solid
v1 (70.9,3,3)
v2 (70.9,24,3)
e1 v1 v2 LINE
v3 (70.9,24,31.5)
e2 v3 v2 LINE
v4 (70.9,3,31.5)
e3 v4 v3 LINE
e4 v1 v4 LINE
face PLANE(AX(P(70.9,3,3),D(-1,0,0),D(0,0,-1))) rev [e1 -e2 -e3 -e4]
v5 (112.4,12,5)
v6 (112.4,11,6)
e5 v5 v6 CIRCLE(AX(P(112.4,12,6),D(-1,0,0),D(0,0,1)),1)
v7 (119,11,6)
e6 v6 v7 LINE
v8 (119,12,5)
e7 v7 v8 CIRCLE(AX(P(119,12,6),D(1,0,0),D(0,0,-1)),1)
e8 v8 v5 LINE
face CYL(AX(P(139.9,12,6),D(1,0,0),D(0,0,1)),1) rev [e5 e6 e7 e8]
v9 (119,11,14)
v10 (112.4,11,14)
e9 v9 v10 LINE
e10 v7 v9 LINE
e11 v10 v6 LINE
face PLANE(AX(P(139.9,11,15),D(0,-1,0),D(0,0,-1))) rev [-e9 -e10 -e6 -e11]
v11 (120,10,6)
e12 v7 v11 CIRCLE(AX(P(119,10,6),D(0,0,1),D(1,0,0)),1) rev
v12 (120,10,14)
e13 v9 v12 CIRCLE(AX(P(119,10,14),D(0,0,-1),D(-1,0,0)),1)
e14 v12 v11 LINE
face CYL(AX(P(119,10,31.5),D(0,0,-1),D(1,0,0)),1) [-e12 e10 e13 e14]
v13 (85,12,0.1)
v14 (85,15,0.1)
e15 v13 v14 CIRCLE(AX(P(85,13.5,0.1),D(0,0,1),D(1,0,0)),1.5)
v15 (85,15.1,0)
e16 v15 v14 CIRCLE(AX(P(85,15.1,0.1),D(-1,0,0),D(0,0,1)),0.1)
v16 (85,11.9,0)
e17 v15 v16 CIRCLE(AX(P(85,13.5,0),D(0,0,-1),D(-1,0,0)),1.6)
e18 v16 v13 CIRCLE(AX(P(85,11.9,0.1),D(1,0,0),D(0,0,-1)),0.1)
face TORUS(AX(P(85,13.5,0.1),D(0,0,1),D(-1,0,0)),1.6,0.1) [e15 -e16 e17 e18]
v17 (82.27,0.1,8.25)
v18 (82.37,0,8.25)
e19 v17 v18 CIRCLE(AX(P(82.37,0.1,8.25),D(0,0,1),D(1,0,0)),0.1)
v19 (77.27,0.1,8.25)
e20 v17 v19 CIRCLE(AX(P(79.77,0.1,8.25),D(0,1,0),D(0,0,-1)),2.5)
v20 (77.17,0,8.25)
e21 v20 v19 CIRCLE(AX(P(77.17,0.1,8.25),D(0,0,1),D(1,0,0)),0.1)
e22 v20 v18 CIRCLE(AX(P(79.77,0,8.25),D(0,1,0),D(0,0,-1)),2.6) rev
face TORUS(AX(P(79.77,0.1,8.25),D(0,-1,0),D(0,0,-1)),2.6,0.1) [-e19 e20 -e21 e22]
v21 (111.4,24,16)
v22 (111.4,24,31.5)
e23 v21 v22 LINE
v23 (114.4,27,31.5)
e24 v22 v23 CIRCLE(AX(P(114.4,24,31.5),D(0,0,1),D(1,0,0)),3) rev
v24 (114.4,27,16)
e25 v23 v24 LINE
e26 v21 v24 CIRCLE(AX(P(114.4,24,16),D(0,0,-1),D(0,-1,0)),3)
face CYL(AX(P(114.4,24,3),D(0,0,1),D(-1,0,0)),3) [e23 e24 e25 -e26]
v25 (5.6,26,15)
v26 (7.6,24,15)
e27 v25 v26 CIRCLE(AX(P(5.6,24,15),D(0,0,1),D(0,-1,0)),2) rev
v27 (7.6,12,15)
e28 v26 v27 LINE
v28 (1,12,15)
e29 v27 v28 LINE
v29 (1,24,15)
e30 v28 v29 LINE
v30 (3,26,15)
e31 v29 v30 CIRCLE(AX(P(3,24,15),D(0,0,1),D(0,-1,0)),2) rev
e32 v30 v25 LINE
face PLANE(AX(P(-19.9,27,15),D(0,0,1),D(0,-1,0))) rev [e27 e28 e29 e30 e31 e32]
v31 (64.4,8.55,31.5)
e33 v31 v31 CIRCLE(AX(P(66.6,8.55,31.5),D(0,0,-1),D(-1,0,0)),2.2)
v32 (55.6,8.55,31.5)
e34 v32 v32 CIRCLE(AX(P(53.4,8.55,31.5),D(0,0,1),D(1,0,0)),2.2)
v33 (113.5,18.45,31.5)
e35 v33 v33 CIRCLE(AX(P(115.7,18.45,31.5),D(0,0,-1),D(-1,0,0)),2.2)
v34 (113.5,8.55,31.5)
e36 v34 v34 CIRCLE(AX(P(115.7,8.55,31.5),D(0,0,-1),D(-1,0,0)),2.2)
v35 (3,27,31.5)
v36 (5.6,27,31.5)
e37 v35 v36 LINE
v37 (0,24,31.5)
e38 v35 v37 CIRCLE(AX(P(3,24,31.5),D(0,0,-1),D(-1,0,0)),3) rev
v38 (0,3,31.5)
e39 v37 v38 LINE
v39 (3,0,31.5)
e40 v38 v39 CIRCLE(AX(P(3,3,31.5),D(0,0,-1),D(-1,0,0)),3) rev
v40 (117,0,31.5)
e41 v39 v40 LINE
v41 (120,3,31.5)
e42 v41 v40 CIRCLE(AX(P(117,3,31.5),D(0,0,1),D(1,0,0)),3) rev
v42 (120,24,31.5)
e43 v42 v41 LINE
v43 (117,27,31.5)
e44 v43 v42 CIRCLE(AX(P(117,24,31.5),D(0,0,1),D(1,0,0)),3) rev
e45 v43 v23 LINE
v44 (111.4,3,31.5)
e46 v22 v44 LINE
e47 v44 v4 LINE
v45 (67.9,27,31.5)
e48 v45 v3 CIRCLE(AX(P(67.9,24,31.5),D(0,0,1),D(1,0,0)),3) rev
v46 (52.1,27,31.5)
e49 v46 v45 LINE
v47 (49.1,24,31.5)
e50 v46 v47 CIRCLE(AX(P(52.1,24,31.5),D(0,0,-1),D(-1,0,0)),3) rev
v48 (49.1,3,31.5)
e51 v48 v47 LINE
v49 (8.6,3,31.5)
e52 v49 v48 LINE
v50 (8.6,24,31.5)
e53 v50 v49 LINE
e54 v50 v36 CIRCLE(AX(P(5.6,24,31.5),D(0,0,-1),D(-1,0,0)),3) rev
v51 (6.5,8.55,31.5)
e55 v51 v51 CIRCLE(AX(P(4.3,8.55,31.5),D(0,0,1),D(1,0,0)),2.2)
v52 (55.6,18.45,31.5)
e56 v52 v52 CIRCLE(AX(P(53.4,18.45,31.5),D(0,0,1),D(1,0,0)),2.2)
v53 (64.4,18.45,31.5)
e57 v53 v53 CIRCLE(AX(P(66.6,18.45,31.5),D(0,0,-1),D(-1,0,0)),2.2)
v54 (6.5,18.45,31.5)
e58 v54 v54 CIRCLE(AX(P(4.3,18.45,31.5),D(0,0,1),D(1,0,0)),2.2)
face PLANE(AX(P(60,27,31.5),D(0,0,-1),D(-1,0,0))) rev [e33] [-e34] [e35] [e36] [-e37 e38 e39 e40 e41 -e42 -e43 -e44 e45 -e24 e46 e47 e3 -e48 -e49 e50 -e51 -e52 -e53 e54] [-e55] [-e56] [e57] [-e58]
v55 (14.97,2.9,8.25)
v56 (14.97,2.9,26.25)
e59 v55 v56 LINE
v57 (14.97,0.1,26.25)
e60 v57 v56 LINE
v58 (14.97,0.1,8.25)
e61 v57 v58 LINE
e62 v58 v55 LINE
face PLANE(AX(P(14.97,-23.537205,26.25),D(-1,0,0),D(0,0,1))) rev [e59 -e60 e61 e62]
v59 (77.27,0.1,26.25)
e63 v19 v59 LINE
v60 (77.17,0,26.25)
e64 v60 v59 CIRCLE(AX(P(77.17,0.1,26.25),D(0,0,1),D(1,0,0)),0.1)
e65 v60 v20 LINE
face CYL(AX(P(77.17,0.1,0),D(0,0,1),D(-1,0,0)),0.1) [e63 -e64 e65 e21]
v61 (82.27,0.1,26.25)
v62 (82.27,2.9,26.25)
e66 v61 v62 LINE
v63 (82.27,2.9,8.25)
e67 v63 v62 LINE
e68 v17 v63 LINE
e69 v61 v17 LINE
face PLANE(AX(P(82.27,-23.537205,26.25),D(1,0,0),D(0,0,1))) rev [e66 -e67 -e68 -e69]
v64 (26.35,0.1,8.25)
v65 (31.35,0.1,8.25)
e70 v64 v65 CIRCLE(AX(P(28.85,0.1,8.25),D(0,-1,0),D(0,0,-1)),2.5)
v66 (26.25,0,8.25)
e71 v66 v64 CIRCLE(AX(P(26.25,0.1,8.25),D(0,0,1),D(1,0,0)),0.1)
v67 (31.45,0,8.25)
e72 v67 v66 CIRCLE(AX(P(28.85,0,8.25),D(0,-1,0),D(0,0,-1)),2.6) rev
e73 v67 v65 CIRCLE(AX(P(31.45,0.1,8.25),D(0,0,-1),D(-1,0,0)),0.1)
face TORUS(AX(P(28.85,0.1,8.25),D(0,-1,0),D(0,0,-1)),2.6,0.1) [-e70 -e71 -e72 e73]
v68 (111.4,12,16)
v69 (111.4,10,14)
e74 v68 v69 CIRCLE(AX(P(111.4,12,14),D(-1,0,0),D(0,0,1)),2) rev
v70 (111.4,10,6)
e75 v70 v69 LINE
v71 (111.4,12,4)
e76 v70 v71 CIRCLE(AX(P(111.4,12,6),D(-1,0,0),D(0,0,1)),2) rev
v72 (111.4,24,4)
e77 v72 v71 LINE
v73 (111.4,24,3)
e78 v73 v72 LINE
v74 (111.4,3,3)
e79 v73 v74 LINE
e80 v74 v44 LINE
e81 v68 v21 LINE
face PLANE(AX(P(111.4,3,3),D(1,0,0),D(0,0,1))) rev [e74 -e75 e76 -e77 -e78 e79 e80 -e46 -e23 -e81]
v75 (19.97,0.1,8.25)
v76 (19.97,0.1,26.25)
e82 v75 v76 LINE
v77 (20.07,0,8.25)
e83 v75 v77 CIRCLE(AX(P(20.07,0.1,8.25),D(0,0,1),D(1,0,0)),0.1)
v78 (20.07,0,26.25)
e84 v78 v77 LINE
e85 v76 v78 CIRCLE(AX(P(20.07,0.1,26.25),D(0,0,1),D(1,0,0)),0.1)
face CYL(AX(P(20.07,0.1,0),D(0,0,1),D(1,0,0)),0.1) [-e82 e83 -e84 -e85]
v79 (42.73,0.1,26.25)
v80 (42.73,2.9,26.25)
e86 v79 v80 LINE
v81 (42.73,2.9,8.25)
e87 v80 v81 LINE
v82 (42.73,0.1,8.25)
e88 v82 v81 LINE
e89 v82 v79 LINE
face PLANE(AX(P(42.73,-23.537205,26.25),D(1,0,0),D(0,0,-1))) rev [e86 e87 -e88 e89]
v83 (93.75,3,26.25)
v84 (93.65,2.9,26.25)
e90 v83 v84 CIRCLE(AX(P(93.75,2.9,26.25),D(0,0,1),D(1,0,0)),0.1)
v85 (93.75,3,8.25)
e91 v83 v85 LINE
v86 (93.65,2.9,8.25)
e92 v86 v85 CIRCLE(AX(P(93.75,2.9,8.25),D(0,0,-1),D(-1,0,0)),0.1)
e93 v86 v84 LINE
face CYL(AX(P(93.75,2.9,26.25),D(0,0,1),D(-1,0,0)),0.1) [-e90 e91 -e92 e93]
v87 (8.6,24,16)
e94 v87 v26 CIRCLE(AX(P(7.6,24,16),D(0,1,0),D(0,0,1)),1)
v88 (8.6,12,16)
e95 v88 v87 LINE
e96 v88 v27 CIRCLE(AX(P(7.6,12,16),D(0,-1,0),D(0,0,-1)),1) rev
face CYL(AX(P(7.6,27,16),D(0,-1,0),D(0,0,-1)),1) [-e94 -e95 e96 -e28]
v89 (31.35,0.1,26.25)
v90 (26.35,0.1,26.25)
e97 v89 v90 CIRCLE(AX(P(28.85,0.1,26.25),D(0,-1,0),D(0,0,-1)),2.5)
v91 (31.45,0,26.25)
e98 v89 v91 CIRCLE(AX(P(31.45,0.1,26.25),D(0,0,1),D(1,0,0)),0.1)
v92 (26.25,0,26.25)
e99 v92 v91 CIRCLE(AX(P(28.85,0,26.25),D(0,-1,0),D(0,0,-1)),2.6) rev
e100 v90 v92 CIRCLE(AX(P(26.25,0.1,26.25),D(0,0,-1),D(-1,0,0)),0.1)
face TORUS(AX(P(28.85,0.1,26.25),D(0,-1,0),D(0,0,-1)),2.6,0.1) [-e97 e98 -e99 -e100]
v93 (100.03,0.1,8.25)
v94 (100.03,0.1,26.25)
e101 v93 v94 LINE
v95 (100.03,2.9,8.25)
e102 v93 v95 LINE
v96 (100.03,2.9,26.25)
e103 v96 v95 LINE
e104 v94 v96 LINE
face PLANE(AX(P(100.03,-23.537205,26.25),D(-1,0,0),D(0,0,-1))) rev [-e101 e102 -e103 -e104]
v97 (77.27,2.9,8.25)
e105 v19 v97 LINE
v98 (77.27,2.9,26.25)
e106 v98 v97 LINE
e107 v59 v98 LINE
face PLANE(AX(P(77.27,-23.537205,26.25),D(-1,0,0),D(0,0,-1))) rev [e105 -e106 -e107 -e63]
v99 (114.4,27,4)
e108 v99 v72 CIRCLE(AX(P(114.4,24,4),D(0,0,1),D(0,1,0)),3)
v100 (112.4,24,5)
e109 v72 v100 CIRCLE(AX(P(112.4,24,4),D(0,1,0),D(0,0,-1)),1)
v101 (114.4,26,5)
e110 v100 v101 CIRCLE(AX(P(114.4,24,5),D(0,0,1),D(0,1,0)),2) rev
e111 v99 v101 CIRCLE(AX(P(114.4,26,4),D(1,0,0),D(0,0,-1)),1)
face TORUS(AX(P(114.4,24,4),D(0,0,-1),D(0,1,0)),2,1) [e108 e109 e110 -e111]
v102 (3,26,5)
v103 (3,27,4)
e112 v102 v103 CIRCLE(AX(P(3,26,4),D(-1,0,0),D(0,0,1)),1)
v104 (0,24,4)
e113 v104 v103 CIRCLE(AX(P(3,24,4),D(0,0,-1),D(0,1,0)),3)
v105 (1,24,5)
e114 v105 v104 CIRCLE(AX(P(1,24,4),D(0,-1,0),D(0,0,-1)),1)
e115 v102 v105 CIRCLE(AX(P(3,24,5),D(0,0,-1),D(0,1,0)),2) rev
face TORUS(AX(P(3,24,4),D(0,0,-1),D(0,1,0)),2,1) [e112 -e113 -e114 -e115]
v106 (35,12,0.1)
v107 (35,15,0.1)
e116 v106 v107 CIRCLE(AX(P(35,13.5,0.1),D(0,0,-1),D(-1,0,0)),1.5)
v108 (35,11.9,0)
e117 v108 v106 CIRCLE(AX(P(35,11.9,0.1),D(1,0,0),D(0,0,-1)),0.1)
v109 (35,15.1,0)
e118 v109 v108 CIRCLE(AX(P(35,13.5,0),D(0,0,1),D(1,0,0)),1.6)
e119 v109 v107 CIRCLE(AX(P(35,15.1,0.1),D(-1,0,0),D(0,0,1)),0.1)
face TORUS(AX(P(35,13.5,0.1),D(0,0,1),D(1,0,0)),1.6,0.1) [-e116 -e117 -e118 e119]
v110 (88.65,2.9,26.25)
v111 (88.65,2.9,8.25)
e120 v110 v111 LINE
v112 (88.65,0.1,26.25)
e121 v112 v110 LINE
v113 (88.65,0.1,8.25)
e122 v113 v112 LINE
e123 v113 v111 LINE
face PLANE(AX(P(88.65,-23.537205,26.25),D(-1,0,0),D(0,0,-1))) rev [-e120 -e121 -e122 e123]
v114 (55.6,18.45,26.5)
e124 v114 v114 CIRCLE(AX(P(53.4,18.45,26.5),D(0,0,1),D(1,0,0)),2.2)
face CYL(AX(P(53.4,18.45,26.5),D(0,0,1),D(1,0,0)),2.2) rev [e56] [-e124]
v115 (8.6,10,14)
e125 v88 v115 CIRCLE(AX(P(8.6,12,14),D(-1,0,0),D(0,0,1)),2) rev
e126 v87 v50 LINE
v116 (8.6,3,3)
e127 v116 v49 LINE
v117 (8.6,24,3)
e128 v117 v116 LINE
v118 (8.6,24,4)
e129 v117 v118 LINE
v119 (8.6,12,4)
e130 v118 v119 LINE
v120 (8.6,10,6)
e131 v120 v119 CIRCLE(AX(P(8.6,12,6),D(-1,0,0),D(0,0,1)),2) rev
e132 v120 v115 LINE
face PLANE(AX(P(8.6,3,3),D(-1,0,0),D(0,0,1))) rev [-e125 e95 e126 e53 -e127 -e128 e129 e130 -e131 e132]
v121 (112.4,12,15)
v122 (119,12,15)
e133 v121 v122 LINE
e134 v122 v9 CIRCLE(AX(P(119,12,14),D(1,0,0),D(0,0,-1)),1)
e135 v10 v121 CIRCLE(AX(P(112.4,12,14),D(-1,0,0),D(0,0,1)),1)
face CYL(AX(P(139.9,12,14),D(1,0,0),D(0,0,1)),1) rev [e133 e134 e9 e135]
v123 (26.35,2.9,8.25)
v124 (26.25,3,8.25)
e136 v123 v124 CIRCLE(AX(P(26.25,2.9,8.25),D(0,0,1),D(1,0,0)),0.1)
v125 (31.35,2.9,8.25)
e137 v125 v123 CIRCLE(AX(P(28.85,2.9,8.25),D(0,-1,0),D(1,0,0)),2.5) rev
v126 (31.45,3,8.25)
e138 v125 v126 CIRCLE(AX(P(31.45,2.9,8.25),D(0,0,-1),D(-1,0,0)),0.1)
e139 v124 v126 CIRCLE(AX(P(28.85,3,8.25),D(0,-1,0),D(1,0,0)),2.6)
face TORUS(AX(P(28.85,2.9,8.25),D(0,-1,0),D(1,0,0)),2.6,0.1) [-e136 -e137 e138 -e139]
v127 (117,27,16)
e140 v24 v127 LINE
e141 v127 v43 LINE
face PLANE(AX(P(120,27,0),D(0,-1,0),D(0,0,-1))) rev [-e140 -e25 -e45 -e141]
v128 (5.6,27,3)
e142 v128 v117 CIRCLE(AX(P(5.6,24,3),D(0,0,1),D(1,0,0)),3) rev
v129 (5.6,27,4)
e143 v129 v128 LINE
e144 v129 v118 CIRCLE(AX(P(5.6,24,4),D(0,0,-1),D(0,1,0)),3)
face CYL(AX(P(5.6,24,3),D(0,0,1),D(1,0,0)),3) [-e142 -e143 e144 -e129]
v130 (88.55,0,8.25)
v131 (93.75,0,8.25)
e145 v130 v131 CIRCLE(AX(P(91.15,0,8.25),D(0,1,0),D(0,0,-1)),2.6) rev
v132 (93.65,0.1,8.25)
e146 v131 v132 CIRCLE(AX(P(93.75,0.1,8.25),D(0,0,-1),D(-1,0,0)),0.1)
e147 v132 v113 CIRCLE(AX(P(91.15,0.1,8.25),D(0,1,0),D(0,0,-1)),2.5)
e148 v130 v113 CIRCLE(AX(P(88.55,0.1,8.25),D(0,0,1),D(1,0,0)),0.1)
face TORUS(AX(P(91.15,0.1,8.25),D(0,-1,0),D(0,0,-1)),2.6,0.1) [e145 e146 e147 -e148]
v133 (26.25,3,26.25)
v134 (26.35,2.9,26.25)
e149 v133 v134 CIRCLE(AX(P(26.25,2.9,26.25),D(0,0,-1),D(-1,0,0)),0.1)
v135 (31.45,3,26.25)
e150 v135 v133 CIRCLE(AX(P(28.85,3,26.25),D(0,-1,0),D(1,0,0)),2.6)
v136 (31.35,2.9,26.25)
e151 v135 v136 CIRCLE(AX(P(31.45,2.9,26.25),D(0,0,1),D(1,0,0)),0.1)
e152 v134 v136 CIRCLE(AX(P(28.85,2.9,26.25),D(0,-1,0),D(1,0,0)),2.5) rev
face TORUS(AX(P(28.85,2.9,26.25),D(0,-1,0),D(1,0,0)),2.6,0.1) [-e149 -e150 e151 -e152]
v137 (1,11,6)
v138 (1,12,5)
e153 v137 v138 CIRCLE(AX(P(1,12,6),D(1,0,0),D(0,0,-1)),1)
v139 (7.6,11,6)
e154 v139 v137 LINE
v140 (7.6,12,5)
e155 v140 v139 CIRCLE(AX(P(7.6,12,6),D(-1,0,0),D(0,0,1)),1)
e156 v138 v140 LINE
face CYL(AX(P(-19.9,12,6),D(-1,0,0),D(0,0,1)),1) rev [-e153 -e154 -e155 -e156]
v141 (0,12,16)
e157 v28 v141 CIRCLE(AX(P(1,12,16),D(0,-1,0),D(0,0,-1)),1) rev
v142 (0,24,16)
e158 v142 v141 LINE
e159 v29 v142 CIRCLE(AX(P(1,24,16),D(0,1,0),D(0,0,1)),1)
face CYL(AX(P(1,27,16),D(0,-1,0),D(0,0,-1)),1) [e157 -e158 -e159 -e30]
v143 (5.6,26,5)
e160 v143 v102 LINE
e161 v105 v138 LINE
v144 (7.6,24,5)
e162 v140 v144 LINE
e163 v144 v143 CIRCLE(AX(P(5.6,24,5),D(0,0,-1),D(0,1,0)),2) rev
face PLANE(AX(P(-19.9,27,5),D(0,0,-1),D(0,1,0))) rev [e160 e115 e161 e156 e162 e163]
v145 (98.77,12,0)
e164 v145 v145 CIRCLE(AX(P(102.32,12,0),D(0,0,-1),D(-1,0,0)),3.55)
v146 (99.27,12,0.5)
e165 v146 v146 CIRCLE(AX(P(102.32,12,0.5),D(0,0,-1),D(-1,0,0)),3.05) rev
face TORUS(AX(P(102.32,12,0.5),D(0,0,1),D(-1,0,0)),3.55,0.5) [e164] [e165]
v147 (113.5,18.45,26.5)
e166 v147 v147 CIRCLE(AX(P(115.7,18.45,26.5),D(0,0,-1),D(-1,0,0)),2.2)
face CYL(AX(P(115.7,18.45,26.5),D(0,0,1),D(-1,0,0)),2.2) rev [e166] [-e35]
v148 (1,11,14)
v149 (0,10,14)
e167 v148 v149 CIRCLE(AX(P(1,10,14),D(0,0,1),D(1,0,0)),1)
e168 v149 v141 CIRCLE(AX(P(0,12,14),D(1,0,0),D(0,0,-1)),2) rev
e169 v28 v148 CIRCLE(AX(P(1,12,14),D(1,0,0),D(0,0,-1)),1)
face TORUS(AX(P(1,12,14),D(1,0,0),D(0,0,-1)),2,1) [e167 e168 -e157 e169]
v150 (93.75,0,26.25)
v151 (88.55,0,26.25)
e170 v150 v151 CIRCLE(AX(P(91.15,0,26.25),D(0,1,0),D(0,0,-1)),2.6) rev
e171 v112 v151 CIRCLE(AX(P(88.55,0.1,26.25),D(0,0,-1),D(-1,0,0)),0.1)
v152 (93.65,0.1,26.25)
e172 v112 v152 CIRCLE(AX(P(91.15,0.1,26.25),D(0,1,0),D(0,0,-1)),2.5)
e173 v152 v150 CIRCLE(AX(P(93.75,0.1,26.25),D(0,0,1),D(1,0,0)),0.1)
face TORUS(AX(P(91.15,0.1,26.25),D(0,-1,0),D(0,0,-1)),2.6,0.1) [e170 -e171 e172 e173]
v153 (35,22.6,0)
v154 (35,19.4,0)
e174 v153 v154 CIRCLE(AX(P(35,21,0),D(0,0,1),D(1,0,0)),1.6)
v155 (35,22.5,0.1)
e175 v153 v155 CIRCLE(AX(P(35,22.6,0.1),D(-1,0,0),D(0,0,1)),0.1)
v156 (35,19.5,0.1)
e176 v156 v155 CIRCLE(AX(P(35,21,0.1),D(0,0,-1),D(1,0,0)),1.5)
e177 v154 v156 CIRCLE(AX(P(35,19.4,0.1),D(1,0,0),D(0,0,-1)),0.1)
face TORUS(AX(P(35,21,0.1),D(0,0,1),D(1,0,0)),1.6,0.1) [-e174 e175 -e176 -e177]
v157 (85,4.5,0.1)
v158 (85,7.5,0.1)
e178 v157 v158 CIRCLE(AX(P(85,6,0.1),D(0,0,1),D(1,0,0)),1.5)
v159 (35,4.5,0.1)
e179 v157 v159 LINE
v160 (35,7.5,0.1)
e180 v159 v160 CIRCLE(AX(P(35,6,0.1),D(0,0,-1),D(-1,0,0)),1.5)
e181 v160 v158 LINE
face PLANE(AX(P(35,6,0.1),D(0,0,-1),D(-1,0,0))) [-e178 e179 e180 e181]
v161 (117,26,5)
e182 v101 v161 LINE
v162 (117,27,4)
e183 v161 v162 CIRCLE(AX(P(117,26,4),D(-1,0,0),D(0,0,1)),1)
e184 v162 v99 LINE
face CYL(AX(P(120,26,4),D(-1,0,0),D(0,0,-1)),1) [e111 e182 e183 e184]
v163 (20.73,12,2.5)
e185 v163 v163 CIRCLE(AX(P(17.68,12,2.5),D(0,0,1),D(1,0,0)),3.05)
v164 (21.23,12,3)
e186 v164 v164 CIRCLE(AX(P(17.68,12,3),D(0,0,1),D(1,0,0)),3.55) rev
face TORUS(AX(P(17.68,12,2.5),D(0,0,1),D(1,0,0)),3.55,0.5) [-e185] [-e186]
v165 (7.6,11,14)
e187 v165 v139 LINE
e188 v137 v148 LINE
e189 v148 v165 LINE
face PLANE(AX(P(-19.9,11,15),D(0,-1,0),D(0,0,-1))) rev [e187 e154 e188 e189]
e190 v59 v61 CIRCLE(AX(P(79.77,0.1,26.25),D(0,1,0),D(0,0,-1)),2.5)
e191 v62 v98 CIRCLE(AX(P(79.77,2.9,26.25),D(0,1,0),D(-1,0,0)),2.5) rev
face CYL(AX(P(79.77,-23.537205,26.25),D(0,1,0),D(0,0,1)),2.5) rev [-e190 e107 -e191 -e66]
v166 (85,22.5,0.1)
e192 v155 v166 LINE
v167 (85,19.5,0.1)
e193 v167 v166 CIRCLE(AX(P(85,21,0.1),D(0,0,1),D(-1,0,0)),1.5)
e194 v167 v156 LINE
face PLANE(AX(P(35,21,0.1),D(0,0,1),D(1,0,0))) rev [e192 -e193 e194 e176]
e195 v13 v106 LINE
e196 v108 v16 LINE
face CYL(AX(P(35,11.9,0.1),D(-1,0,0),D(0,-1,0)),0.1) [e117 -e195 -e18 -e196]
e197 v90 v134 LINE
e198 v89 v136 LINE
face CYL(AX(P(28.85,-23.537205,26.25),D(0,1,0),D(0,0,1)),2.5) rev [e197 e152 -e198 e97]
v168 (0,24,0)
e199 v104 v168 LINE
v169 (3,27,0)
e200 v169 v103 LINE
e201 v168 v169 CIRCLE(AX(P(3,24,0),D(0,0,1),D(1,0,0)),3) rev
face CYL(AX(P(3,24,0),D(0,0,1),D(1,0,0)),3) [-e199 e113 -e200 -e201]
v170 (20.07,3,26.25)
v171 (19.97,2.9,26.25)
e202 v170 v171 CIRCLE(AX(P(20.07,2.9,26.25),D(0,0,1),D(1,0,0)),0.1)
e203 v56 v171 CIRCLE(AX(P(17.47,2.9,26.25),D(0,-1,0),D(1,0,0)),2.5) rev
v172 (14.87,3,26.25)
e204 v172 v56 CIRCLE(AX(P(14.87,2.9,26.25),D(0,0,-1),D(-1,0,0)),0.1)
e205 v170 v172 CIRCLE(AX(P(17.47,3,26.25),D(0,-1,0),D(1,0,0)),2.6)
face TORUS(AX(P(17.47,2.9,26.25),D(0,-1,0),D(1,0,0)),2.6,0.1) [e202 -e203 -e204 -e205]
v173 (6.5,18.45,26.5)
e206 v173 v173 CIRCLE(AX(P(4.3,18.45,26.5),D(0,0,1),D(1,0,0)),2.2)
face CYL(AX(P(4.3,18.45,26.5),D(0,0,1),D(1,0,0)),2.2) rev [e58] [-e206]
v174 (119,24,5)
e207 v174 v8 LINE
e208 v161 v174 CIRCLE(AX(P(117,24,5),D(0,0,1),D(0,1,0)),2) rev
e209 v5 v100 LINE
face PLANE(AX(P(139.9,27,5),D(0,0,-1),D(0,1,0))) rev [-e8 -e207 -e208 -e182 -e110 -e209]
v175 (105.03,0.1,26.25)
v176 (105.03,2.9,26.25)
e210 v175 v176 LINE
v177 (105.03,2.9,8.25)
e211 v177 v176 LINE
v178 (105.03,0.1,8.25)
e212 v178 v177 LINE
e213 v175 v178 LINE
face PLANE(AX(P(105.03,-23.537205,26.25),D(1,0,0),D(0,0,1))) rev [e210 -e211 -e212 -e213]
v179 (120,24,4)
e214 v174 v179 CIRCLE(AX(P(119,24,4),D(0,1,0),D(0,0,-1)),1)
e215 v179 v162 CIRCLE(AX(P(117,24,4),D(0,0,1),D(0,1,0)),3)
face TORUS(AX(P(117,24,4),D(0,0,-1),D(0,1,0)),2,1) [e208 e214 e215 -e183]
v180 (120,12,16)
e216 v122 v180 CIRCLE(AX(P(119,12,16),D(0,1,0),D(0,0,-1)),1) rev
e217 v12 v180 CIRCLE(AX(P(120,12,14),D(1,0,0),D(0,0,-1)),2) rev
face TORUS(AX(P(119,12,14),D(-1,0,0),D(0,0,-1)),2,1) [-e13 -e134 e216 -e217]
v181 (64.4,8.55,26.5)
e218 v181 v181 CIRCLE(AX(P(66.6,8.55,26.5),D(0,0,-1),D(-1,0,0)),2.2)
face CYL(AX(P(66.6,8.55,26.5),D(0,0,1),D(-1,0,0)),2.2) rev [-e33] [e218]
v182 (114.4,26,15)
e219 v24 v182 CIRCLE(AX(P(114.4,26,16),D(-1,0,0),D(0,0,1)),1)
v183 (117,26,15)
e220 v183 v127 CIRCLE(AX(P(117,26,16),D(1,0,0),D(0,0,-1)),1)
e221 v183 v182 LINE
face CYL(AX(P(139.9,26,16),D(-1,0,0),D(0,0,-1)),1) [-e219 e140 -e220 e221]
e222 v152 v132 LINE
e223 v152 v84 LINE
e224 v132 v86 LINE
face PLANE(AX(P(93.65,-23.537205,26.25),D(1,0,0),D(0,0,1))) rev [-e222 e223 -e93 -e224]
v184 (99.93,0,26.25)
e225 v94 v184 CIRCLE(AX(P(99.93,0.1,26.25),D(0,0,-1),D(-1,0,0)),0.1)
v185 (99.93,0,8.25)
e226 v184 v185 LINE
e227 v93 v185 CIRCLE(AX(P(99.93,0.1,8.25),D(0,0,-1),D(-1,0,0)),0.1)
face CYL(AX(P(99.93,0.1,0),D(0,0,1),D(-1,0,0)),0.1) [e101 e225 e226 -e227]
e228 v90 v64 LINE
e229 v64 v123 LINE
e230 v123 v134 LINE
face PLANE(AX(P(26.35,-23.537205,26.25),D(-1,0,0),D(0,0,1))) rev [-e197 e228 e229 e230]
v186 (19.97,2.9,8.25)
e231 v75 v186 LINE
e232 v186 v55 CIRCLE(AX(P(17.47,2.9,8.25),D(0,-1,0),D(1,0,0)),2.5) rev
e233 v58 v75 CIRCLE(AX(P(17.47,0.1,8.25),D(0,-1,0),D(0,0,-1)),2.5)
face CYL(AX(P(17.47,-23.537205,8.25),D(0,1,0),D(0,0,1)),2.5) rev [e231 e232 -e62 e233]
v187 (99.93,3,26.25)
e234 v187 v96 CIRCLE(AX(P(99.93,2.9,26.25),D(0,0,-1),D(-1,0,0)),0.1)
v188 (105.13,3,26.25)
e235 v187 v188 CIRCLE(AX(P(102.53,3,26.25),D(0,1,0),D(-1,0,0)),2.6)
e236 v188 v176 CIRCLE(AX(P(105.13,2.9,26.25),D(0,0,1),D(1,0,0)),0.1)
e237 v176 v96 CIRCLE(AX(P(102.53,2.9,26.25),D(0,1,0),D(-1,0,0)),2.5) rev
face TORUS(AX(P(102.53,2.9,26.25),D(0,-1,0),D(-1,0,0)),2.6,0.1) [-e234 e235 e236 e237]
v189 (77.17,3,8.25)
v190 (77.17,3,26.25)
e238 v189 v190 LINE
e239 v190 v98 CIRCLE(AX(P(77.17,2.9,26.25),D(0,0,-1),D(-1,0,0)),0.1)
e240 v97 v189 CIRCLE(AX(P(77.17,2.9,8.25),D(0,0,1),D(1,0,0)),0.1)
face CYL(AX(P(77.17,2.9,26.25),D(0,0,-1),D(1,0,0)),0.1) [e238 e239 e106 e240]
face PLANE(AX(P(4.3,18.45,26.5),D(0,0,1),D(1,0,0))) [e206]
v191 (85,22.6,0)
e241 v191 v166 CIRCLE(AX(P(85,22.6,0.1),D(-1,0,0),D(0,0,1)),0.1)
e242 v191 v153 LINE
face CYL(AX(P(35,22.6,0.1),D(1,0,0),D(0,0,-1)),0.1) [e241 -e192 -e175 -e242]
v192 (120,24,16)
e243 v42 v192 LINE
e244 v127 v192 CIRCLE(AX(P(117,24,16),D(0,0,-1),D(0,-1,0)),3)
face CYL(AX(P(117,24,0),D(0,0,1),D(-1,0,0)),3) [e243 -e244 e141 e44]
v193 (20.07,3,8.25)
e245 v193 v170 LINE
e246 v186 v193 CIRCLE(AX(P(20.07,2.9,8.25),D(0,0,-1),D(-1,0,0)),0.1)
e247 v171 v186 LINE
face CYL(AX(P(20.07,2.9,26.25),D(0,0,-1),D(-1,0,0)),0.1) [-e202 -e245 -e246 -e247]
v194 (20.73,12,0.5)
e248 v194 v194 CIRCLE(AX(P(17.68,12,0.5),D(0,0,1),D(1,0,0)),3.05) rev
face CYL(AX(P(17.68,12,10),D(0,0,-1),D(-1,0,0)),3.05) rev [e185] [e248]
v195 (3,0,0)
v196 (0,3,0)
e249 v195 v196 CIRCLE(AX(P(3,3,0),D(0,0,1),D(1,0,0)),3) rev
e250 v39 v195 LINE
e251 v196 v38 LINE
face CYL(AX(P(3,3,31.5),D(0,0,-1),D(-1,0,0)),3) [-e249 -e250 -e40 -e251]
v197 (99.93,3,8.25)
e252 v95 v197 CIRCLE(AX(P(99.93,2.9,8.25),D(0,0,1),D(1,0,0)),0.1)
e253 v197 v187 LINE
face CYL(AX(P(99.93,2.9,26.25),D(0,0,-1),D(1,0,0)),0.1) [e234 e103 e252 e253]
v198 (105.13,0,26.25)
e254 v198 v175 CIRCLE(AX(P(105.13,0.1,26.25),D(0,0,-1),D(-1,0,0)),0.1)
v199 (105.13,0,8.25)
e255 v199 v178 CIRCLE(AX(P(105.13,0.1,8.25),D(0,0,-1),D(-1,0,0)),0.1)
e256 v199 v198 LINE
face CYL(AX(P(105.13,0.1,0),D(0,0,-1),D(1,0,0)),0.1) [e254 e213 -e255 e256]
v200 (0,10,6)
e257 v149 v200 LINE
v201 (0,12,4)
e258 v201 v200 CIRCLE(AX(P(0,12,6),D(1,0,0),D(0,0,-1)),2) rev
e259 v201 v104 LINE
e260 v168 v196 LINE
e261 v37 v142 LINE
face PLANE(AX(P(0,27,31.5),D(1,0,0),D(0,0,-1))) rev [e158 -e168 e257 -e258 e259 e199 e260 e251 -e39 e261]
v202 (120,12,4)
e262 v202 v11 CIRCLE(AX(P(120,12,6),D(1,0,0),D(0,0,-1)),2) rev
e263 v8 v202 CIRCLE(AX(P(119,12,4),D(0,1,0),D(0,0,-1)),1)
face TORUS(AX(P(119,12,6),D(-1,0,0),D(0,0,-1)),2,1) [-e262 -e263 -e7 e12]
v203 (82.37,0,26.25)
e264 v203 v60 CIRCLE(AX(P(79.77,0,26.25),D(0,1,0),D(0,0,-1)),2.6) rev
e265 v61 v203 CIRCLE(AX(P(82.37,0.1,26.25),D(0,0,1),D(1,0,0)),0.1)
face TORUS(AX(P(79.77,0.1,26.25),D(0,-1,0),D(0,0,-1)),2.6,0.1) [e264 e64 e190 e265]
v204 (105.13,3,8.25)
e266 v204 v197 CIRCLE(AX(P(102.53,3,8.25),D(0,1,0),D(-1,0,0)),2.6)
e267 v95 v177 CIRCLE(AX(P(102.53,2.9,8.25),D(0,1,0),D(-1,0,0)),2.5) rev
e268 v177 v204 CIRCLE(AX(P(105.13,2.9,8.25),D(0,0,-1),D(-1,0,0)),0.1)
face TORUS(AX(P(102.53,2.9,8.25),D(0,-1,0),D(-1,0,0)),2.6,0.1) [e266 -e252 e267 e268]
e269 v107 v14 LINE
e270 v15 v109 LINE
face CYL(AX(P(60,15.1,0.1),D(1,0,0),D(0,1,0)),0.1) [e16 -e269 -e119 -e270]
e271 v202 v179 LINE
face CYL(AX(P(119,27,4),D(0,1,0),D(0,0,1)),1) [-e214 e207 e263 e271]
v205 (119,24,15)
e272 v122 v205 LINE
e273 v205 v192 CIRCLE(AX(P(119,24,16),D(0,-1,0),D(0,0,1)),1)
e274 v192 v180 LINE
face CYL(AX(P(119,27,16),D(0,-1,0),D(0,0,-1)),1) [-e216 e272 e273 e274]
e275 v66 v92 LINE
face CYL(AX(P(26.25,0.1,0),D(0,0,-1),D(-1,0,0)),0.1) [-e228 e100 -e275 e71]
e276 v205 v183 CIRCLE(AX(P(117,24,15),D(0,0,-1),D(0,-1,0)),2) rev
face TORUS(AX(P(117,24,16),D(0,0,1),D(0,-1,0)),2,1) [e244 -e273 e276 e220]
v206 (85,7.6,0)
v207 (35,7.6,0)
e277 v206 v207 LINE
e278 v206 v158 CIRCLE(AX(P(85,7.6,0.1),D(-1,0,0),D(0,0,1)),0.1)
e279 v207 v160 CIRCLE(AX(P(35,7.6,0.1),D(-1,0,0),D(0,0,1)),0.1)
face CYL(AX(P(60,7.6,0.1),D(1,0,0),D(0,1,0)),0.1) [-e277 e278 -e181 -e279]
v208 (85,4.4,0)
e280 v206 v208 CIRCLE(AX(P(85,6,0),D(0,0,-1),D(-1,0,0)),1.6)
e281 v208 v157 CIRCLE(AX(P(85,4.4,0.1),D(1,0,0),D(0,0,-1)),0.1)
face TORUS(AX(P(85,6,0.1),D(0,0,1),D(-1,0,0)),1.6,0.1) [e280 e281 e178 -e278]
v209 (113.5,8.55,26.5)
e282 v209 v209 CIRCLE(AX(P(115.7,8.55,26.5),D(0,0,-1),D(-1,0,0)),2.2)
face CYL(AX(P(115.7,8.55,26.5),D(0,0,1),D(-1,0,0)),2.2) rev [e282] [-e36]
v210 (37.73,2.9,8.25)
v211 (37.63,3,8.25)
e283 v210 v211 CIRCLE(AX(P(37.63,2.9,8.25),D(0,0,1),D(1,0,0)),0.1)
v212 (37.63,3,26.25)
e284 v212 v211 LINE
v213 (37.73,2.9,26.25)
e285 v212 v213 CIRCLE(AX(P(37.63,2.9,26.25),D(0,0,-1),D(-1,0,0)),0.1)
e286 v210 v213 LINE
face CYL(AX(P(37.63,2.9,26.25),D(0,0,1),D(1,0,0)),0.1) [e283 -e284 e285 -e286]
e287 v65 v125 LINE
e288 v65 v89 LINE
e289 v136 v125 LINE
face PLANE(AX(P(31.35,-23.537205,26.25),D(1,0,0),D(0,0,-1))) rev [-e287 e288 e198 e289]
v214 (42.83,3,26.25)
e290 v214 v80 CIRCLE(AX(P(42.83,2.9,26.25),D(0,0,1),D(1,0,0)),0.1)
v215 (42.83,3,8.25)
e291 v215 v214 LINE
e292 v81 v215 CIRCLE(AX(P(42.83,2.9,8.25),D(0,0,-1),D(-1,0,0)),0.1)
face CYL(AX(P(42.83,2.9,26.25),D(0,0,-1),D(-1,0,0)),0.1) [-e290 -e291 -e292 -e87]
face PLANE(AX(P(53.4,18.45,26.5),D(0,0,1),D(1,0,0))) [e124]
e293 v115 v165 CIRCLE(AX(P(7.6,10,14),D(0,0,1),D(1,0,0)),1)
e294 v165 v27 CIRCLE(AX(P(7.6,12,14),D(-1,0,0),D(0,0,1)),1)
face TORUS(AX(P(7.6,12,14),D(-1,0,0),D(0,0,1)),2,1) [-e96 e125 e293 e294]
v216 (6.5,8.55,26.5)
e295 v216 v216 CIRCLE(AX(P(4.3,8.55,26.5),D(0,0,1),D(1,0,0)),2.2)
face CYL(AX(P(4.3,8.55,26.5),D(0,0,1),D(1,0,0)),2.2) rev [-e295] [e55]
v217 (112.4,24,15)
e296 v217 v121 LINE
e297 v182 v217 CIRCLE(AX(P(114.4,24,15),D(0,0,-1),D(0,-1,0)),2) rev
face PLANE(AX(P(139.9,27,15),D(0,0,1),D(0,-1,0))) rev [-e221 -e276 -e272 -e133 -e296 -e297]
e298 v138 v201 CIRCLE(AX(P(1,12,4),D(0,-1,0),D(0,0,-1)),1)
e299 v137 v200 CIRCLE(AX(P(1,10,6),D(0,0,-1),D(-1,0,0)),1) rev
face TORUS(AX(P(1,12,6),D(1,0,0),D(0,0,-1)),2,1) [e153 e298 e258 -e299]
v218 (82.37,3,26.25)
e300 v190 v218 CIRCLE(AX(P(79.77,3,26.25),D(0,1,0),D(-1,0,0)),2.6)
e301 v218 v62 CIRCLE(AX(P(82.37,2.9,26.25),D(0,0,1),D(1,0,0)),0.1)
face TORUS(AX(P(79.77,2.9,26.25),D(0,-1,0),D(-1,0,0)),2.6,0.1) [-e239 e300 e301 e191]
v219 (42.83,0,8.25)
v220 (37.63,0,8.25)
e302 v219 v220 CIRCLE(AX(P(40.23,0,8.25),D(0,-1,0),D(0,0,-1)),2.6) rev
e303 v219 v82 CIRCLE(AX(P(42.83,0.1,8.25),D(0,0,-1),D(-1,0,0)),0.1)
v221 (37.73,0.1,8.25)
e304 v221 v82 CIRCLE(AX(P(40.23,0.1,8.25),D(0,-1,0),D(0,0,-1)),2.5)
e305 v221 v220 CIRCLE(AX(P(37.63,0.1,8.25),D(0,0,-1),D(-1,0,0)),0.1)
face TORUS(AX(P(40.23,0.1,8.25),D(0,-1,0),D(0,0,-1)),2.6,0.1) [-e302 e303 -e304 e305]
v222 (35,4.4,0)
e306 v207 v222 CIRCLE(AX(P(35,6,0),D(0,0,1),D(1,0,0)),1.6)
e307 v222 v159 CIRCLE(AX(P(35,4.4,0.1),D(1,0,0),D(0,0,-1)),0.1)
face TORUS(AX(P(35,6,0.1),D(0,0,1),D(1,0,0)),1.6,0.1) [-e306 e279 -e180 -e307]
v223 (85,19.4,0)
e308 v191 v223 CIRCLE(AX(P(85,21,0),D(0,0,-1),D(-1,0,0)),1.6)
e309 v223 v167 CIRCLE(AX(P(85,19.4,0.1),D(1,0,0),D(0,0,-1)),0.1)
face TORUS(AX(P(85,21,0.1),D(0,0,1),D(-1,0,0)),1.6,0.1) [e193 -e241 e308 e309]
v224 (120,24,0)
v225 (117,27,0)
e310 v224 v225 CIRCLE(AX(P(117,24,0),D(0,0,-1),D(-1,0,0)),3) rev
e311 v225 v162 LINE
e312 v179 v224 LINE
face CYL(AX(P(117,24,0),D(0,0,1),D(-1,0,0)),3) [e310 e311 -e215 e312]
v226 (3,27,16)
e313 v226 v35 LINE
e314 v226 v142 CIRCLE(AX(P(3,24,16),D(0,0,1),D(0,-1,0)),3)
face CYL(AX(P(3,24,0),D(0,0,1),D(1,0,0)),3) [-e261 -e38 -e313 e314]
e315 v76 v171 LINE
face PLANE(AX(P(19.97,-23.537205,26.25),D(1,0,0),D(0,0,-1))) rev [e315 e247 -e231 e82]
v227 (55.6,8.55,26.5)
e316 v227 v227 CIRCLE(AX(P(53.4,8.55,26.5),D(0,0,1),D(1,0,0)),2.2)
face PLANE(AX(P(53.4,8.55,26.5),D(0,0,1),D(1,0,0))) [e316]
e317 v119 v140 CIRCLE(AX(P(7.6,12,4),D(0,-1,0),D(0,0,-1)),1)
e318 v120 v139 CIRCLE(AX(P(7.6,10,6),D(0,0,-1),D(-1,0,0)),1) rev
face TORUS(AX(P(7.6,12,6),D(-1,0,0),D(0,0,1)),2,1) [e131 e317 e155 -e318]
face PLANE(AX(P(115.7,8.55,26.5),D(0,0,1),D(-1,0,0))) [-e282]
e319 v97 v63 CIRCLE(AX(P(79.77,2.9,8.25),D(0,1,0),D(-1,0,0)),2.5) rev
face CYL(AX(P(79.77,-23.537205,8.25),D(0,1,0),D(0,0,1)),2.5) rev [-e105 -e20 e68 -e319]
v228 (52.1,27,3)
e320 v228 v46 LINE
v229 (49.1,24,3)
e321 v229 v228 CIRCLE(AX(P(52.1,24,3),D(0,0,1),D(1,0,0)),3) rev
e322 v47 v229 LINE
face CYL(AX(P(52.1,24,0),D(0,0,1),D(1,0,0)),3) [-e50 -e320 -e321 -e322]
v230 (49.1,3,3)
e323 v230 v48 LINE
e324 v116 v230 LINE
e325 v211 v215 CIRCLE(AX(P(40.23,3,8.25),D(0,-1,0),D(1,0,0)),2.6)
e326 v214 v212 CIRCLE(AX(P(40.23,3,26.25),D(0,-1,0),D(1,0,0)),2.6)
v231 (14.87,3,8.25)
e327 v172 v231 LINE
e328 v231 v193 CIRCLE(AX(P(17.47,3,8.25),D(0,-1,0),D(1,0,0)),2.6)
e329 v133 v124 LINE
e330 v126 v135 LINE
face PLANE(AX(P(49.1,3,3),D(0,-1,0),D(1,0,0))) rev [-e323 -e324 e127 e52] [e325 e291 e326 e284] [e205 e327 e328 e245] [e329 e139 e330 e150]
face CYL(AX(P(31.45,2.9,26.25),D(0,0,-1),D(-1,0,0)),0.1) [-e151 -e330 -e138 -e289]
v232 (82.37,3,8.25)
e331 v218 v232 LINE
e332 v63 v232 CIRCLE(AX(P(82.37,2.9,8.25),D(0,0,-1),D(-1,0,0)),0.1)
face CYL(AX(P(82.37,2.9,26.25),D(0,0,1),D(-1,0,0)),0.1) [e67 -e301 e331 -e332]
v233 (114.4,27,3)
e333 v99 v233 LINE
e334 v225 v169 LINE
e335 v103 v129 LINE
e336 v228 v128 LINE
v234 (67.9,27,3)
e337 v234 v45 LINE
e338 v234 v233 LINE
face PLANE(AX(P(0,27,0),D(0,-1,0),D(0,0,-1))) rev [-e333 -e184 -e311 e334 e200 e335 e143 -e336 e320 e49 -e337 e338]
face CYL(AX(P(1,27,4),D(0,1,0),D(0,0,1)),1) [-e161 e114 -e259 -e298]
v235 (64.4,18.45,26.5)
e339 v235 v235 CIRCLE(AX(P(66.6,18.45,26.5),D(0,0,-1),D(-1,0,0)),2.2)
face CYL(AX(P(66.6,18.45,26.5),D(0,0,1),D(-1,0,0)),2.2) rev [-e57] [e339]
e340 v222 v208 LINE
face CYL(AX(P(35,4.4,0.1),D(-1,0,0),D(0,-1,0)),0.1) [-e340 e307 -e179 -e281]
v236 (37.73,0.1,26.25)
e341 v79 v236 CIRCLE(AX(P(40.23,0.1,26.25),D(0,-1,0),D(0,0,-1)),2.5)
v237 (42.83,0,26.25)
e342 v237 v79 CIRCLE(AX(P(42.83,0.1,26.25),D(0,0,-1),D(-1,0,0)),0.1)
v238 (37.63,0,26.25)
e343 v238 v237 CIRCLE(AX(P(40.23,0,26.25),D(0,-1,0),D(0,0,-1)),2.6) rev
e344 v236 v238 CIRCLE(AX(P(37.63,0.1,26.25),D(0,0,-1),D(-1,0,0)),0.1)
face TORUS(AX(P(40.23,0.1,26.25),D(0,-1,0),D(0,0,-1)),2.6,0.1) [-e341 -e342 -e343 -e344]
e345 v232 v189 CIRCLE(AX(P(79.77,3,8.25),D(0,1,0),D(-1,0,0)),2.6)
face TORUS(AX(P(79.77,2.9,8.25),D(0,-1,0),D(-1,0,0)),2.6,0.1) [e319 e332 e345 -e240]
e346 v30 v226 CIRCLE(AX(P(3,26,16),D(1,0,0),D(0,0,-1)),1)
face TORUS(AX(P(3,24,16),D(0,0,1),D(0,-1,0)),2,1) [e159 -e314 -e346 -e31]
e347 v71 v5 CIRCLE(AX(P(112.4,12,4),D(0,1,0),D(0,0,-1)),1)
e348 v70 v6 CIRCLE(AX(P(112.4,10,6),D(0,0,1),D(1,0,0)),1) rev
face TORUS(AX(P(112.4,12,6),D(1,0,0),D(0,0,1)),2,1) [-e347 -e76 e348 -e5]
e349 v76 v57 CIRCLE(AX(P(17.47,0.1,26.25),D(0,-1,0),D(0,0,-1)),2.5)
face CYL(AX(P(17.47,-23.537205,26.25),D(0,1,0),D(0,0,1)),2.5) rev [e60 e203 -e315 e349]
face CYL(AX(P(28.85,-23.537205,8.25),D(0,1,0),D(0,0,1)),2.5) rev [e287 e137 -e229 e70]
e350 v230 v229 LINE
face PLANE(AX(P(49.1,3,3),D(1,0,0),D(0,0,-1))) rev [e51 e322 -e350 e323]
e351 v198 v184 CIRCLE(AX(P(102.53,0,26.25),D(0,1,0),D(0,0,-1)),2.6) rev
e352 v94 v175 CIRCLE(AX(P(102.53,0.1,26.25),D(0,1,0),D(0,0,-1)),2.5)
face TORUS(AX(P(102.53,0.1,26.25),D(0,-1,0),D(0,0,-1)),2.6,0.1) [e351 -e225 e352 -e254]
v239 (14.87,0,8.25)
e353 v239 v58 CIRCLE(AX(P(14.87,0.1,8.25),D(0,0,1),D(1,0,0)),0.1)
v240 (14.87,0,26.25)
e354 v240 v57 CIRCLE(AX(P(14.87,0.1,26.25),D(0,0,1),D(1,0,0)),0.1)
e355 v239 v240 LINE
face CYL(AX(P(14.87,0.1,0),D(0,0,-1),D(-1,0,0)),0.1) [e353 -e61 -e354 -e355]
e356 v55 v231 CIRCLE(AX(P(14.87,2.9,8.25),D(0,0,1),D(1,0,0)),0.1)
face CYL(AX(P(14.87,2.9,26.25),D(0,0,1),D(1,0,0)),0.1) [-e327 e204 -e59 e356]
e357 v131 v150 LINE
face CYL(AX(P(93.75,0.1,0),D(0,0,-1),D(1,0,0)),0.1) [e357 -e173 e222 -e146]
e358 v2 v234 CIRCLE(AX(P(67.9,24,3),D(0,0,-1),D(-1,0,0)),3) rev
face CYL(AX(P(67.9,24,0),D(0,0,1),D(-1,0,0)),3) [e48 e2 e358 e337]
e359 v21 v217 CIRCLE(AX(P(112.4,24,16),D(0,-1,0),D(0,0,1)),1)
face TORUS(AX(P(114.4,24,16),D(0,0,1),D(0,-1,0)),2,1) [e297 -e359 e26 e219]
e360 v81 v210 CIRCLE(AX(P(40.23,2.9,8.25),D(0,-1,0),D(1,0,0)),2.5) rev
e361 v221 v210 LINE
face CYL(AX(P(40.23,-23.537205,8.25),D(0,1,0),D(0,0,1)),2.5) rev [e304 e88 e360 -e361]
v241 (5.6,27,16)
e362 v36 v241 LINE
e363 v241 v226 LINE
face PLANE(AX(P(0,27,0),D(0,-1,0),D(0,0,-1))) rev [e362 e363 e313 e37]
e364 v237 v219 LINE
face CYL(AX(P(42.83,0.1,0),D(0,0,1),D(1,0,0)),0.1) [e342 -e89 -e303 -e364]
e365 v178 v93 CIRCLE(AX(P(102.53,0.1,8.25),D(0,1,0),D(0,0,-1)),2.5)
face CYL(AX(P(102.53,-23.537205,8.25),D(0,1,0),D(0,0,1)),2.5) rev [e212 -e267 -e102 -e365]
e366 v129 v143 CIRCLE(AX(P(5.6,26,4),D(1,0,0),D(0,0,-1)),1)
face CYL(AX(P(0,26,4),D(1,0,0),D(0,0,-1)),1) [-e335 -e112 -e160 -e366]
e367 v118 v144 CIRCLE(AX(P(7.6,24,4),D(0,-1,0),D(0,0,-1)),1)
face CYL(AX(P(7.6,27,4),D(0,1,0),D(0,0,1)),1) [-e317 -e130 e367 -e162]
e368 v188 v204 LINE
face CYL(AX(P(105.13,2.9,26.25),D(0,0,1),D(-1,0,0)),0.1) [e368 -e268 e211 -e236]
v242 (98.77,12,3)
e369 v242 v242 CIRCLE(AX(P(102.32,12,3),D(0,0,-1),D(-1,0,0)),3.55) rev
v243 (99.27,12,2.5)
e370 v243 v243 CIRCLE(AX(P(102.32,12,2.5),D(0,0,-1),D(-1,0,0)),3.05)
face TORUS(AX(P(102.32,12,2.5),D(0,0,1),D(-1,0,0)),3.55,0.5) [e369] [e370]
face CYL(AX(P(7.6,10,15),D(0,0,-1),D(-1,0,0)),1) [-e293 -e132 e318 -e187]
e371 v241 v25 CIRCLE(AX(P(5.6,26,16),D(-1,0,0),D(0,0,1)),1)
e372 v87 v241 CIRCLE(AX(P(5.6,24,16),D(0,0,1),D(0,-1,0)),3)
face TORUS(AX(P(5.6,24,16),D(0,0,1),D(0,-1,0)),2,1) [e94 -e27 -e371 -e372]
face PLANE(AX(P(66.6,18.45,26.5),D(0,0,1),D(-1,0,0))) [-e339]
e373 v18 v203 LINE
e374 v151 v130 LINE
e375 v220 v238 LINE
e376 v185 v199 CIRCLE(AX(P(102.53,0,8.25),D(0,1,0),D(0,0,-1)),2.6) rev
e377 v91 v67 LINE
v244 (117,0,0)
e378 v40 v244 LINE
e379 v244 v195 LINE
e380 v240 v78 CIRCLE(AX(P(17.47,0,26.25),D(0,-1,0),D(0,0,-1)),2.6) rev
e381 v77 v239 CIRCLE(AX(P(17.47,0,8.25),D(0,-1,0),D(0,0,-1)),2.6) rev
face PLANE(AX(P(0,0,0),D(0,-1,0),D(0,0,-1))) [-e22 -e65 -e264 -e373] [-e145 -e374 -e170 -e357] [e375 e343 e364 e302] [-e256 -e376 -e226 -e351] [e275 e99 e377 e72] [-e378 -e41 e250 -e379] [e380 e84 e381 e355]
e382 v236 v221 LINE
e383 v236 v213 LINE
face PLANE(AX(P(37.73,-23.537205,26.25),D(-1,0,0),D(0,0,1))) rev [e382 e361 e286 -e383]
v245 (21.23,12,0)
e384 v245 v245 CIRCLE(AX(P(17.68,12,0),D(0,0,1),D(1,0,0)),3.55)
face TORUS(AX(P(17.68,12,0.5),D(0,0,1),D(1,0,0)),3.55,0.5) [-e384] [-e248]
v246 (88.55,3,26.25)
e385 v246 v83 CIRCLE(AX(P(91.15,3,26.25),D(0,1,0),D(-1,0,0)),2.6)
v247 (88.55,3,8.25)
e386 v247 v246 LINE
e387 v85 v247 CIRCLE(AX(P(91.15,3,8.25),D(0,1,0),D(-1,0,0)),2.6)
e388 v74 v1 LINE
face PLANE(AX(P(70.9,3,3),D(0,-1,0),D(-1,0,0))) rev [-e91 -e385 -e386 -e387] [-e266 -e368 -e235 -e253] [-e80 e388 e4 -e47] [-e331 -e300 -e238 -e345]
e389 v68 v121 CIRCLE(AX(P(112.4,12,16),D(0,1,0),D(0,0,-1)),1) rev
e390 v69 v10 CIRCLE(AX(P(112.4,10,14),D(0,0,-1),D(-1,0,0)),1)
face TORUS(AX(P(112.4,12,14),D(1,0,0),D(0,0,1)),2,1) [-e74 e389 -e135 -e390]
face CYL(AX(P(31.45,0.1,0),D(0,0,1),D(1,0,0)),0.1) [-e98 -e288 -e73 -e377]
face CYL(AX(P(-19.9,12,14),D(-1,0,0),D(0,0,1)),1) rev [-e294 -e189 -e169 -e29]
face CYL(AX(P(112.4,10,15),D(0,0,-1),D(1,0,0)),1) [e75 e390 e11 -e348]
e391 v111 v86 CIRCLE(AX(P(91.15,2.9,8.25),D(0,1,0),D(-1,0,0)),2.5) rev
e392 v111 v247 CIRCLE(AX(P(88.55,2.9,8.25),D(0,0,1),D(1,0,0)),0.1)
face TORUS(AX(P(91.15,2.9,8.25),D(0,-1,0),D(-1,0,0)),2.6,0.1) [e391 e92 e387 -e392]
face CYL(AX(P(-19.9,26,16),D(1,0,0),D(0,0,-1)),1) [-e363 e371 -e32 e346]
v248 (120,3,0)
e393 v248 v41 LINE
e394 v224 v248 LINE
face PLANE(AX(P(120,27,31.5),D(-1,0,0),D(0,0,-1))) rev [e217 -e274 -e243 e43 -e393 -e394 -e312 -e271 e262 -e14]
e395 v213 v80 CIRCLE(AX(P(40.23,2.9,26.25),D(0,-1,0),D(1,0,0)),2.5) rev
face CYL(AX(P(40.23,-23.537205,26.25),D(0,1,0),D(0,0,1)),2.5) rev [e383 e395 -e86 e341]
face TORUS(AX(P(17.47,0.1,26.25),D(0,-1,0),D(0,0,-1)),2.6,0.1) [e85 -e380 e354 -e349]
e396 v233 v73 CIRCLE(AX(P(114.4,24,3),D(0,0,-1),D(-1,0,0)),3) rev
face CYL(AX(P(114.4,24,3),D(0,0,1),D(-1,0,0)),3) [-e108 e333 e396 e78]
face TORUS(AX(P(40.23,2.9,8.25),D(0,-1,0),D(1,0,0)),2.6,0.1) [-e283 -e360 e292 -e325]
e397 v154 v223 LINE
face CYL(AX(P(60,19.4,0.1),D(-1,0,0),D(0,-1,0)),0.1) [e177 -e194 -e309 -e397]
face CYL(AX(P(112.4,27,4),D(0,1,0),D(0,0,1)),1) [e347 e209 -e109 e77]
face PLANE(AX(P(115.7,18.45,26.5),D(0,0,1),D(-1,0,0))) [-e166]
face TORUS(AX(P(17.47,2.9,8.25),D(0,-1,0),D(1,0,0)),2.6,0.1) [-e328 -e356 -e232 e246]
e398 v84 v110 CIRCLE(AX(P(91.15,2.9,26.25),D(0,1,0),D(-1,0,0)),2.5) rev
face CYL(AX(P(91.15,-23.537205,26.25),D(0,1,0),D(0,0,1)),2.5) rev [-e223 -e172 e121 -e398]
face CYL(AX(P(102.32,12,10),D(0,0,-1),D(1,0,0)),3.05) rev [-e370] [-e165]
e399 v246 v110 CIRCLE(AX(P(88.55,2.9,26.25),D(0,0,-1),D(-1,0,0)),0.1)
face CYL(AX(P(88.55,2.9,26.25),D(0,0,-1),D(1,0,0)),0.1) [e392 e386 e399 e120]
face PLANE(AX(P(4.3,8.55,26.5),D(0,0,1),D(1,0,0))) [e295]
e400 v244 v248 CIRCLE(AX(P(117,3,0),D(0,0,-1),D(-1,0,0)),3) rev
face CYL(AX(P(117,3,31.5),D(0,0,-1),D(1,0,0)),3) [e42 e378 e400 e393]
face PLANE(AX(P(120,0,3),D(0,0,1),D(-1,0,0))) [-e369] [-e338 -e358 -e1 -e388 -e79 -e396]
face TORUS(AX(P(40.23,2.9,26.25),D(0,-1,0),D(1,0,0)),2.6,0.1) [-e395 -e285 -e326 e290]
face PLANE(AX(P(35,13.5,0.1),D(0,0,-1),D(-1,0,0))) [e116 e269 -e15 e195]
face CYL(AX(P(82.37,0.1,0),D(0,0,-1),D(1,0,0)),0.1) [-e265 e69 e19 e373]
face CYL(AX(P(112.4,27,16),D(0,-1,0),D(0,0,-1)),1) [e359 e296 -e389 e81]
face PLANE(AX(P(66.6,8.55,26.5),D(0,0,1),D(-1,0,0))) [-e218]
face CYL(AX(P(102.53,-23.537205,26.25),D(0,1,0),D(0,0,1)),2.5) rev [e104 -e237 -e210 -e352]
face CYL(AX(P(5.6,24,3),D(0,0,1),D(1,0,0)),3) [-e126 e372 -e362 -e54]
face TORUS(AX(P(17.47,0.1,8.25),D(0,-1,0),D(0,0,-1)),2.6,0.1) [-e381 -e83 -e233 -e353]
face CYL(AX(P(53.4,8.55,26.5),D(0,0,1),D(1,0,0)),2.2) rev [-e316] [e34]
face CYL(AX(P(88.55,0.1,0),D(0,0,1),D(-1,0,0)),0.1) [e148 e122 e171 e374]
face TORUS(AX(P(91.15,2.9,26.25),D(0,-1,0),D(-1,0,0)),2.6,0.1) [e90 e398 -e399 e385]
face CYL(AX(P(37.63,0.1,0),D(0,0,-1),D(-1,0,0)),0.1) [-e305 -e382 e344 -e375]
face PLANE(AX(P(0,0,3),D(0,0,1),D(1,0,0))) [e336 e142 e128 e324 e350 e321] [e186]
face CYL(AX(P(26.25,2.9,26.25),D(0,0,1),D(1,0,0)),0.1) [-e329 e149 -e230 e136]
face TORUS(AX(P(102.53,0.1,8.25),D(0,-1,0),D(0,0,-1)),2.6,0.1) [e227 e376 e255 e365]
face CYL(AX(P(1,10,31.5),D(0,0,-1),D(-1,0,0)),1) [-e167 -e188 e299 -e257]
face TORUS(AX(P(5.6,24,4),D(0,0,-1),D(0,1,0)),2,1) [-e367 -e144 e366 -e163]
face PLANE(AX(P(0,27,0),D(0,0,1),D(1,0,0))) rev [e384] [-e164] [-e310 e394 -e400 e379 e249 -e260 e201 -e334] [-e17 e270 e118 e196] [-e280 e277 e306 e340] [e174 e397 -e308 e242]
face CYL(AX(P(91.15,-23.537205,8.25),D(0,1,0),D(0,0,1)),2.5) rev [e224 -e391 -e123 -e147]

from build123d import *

# Parameters (mm, degrees)
BOSS_EXTRUDE1_DEPTH = 27
SKETCH2_R           = 2.2
CUT_EXTRUDE1_DEPTH  = 5
SKETCH4_W           = 40.5
SKETCH4_H           = 21
CUT_EXTRUDE2_DEPTH  = 28.5
SKETCH5_W           = 40.5
SKETCH5_H           = 3
CUT_EXTRUDE4_DEPTH  = 28.5
CUT_EXTRUDE7_DEPTH  = 3
SKETCH6_W           = 10
SKETCH6_H           = 16
CUT_EXTRUDE5_DEPTH  = 28.5
FILLET1_R           = 3
FILLET2_R           = 1
SKETCH9_R           = 3.05
CUT_EXTRUDE6_DEPTH  = 10
FILLET3_R           = 0.5
CUT_EXTRUDE8_DEPTH  = 0.1
FILLET4_R           = 0.1


with BuildPart() as part:
    # Sketch1 → Boss-Extrude1 (new body)
    with BuildSketch(Plane(origin=(0, 0, 0), x_dir=(1, 0, 0), z_dir=(0, 1, 0))):
        Polygon((0, 0), (60, 0), (60, -31.5), (0, -31.5), (0, -26.5), (0, -3), align=None)
    extrude(amount=BOSS_EXTRUDE1_DEPTH)

    # Sketch2 → Cut-Extrude1 (cut)
    with BuildSketch(Plane.XY.offset(31.5)):
        with Locations((4.3, 18.45)):
            Circle(SKETCH2_R)
        with Locations((4.3, 8.55)):
            Circle(SKETCH2_R)
        with Locations((53.4, 18.45)):
            Circle(SKETCH2_R)
        with Locations((53.4, 8.55)):
            Circle(SKETCH2_R)
    extrude(amount=-CUT_EXTRUDE1_DEPTH, mode=Mode.SUBTRACT)

    # Sketch4 → Cut-Extrude2 (cut)
    with BuildSketch(Plane.XY.offset(31.5)):
        with Locations((28.85, 13.5)):
            Rectangle(SKETCH4_W, SKETCH4_H)
    extrude(amount=-CUT_EXTRUDE2_DEPTH, mode=Mode.SUBTRACT)

    # Sketch5 → Cut-Extrude4 (cut)
    with BuildSketch(Plane.XY.offset(31.5)):
        with Locations((28.85, 25.5)):
            Rectangle(SKETCH5_W, SKETCH5_H)
    extrude(amount=-CUT_EXTRUDE4_DEPTH, mode=Mode.SUBTRACT)

    # Sketch10 → Cut-Extrude7 (cut)
    with BuildSketch(Plane(origin=(0, 3, 0), x_dir=(1, 0, 0), z_dir=(0, 1, 0))):
        with BuildLine():
            Line((31.35, -26.25), (31.35, -8.25))
            ThreePointArc((31.35, -8.25), (28.85, -5.75), (26.35, -8.25))
            Line((26.35, -8.25), (26.35, -26.25))
            ThreePointArc((26.35, -26.25), (28.85, -28.75), (31.35, -26.25))
        make_face()
        with BuildLine():
            Line((42.73, -26.25), (42.73, -8.25))
            ThreePointArc((42.73, -8.25), (40.23, -5.75), (37.73, -8.25))
            Line((37.73, -8.25), (37.73, -26.25))
            ThreePointArc((37.73, -26.25), (40.23, -28.75), (42.73, -26.25))
        make_face()
        with BuildLine():
            Line((19.97, -26.25), (19.97, -8.25))
            ThreePointArc((19.97, -8.25), (17.47, -5.75), (14.97, -8.25))
            Line((14.97, -8.25), (14.97, -26.25))
            ThreePointArc((14.97, -26.25), (17.47, -28.75), (19.97, -26.25))
        make_face()
    extrude(amount=-CUT_EXTRUDE7_DEPTH, mode=Mode.SUBTRACT)

    # Sketch6 → Cut-Extrude5 (cut)
    with BuildSketch(Plane(origin=(8.6, 0, 0), x_dir=(0, 0, -1), z_dir=(1, 0, 0))):
        with Locations((-10, 19)):
            Rectangle(SKETCH6_W, SKETCH6_H)
    extrude(amount=-CUT_EXTRUDE5_DEPTH, mode=Mode.SUBTRACT)

    # Fillet1
    fillet1_edges = [part.edges().sort_by_distance(p)[0] for p in [
        (8.6, 27, 23.25),
        (0, 27, 23.25),
        (0, 27, 2.5),
        (8.6, 27, 4),
        (49.1, 27, 17.25),
        (0, 0, 15.75),
    ]]
    fillet(fillet1_edges, radius=FILLET1_R)

    # Fillet2
    fillet2_edges = [part.edges().sort_by_distance(p)[0] for p in [
        (4.3, 11, 15),
        (0, 17.5, 5),
        (0, 11, 10),
        (4.3, 11, 5),
        (8.6, 11, 10),
        (8.6, 17.5, 5),
        (0, 17.5, 15),
        (4.3, 27, 5),
        (7.721320344, 26.121320344, 5),
        (0.878679656, 26.121320344, 5),
        (8.6, 17.5, 15),
        (4.3, 27, 15),
        (7.721320344, 26.121320344, 15),
        (0.878679656, 26.121320344, 15),
    ]]
    fillet(fillet2_edges, radius=FILLET2_R)

    # Sketch9 → Cut-Extrude6 (cut)
    with BuildSketch(Plane(origin=(0, 0, 0), x_dir=(-1, 0, 0), z_dir=(0, 0, -1))):
        with Locations((-17.68, 12)):
            Circle(SKETCH9_R)
    extrude(amount=-CUT_EXTRUDE6_DEPTH, mode=Mode.SUBTRACT)

    # Fillet3
    fillet3_edges = [part.edges().sort_by_distance(p)[0] for p in [
        (20.73, 12, 3),
        (20.73, 12, 0),
    ]]
    fillet(fillet3_edges, radius=FILLET3_R)

    # Sketch12 → Cut-Extrude8 (cut)
    with BuildSketch(Plane(origin=(0, 0, 0), x_dir=(-1, 0, 0), z_dir=(0, 0, -1))):
        with BuildLine():
            Line((-60, 15), (-35, 15))
            ThreePointArc((-35, 15), (-33.5, 13.5), (-35, 12))
            Line((-35, 12), (-60, 12))
            Line((-60, 12), (-60, 15))
        make_face()
        with BuildLine():
            Line((-60, 7.5), (-35, 7.5))
            ThreePointArc((-35, 7.5), (-33.5, 6), (-35, 4.5))
            Line((-35, 4.5), (-60, 4.5))
            Line((-60, 4.5), (-60, 7.5))
        make_face()
        with BuildLine():
            Line((-60, 22.5), (-60, 19.5))
            Line((-60, 19.5), (-35, 19.5))
            ThreePointArc((-35, 19.5), (-33.5, 21), (-35, 22.5))
            Line((-35, 22.5), (-60, 22.5))
        make_face()
    extrude(amount=-CUT_EXTRUDE8_DEPTH, mode=Mode.SUBTRACT)

    # Fillet4
    fillet4_edges = [part.edges().sort_by_distance(p)[0] for p in [
        (47.5, 4.5, 0),
        (33.5, 6, 0),
        (47.5, 12, 0),
        (33.5, 13.5, 0),
        (47.5, 19.5, 0),
        (33.5, 21, 0),
        (47.5, 7.5, 0),
        (47.5, 15, 0),
        (47.5, 22.5, 0),
        (14.97, 3, 17.25),
        (17.47, 3, 5.75),
        (19.97, 3, 17.25),
        (26.35, 3, 17.25),
        (28.85, 3, 5.75),
        (31.35, 3, 17.25),
        (37.73, 3, 17.25),
        (40.23, 3, 5.75),
        (42.73, 3, 17.25),
        (40.23, 0, 5.75),
        (42.73, 0, 17.25),
        (40.23, 0, 28.75),
        (26.35, 0, 17.25),
        (28.85, 0, 5.75),
        (31.35, 0, 17.25),
        (17.47, 0, 28.75),
        (14.97, 0, 17.25),
        (17.47, 0, 5.75),
        (17.47, 3, 28.75),
        (28.85, 3, 28.75),
        (40.23, 3, 28.75),
        (37.73, 0, 17.25),
        (28.85, 0, 28.75),
        (19.97, 0, 17.25),
    ]]
    fillet(fillet4_edges, radius=FILLET4_R - 0.0001)  # a hair under: the kernel refuses the full size

    # Mirror1: part across plane


with BuildPart() as part_1:
    add(part.part)
    add(part.part.mirror(Plane(origin=(60, 27, 0), x_dir=(0, 0, 1), z_dir=(-1, 0, 0))))


solid = part_1.part
